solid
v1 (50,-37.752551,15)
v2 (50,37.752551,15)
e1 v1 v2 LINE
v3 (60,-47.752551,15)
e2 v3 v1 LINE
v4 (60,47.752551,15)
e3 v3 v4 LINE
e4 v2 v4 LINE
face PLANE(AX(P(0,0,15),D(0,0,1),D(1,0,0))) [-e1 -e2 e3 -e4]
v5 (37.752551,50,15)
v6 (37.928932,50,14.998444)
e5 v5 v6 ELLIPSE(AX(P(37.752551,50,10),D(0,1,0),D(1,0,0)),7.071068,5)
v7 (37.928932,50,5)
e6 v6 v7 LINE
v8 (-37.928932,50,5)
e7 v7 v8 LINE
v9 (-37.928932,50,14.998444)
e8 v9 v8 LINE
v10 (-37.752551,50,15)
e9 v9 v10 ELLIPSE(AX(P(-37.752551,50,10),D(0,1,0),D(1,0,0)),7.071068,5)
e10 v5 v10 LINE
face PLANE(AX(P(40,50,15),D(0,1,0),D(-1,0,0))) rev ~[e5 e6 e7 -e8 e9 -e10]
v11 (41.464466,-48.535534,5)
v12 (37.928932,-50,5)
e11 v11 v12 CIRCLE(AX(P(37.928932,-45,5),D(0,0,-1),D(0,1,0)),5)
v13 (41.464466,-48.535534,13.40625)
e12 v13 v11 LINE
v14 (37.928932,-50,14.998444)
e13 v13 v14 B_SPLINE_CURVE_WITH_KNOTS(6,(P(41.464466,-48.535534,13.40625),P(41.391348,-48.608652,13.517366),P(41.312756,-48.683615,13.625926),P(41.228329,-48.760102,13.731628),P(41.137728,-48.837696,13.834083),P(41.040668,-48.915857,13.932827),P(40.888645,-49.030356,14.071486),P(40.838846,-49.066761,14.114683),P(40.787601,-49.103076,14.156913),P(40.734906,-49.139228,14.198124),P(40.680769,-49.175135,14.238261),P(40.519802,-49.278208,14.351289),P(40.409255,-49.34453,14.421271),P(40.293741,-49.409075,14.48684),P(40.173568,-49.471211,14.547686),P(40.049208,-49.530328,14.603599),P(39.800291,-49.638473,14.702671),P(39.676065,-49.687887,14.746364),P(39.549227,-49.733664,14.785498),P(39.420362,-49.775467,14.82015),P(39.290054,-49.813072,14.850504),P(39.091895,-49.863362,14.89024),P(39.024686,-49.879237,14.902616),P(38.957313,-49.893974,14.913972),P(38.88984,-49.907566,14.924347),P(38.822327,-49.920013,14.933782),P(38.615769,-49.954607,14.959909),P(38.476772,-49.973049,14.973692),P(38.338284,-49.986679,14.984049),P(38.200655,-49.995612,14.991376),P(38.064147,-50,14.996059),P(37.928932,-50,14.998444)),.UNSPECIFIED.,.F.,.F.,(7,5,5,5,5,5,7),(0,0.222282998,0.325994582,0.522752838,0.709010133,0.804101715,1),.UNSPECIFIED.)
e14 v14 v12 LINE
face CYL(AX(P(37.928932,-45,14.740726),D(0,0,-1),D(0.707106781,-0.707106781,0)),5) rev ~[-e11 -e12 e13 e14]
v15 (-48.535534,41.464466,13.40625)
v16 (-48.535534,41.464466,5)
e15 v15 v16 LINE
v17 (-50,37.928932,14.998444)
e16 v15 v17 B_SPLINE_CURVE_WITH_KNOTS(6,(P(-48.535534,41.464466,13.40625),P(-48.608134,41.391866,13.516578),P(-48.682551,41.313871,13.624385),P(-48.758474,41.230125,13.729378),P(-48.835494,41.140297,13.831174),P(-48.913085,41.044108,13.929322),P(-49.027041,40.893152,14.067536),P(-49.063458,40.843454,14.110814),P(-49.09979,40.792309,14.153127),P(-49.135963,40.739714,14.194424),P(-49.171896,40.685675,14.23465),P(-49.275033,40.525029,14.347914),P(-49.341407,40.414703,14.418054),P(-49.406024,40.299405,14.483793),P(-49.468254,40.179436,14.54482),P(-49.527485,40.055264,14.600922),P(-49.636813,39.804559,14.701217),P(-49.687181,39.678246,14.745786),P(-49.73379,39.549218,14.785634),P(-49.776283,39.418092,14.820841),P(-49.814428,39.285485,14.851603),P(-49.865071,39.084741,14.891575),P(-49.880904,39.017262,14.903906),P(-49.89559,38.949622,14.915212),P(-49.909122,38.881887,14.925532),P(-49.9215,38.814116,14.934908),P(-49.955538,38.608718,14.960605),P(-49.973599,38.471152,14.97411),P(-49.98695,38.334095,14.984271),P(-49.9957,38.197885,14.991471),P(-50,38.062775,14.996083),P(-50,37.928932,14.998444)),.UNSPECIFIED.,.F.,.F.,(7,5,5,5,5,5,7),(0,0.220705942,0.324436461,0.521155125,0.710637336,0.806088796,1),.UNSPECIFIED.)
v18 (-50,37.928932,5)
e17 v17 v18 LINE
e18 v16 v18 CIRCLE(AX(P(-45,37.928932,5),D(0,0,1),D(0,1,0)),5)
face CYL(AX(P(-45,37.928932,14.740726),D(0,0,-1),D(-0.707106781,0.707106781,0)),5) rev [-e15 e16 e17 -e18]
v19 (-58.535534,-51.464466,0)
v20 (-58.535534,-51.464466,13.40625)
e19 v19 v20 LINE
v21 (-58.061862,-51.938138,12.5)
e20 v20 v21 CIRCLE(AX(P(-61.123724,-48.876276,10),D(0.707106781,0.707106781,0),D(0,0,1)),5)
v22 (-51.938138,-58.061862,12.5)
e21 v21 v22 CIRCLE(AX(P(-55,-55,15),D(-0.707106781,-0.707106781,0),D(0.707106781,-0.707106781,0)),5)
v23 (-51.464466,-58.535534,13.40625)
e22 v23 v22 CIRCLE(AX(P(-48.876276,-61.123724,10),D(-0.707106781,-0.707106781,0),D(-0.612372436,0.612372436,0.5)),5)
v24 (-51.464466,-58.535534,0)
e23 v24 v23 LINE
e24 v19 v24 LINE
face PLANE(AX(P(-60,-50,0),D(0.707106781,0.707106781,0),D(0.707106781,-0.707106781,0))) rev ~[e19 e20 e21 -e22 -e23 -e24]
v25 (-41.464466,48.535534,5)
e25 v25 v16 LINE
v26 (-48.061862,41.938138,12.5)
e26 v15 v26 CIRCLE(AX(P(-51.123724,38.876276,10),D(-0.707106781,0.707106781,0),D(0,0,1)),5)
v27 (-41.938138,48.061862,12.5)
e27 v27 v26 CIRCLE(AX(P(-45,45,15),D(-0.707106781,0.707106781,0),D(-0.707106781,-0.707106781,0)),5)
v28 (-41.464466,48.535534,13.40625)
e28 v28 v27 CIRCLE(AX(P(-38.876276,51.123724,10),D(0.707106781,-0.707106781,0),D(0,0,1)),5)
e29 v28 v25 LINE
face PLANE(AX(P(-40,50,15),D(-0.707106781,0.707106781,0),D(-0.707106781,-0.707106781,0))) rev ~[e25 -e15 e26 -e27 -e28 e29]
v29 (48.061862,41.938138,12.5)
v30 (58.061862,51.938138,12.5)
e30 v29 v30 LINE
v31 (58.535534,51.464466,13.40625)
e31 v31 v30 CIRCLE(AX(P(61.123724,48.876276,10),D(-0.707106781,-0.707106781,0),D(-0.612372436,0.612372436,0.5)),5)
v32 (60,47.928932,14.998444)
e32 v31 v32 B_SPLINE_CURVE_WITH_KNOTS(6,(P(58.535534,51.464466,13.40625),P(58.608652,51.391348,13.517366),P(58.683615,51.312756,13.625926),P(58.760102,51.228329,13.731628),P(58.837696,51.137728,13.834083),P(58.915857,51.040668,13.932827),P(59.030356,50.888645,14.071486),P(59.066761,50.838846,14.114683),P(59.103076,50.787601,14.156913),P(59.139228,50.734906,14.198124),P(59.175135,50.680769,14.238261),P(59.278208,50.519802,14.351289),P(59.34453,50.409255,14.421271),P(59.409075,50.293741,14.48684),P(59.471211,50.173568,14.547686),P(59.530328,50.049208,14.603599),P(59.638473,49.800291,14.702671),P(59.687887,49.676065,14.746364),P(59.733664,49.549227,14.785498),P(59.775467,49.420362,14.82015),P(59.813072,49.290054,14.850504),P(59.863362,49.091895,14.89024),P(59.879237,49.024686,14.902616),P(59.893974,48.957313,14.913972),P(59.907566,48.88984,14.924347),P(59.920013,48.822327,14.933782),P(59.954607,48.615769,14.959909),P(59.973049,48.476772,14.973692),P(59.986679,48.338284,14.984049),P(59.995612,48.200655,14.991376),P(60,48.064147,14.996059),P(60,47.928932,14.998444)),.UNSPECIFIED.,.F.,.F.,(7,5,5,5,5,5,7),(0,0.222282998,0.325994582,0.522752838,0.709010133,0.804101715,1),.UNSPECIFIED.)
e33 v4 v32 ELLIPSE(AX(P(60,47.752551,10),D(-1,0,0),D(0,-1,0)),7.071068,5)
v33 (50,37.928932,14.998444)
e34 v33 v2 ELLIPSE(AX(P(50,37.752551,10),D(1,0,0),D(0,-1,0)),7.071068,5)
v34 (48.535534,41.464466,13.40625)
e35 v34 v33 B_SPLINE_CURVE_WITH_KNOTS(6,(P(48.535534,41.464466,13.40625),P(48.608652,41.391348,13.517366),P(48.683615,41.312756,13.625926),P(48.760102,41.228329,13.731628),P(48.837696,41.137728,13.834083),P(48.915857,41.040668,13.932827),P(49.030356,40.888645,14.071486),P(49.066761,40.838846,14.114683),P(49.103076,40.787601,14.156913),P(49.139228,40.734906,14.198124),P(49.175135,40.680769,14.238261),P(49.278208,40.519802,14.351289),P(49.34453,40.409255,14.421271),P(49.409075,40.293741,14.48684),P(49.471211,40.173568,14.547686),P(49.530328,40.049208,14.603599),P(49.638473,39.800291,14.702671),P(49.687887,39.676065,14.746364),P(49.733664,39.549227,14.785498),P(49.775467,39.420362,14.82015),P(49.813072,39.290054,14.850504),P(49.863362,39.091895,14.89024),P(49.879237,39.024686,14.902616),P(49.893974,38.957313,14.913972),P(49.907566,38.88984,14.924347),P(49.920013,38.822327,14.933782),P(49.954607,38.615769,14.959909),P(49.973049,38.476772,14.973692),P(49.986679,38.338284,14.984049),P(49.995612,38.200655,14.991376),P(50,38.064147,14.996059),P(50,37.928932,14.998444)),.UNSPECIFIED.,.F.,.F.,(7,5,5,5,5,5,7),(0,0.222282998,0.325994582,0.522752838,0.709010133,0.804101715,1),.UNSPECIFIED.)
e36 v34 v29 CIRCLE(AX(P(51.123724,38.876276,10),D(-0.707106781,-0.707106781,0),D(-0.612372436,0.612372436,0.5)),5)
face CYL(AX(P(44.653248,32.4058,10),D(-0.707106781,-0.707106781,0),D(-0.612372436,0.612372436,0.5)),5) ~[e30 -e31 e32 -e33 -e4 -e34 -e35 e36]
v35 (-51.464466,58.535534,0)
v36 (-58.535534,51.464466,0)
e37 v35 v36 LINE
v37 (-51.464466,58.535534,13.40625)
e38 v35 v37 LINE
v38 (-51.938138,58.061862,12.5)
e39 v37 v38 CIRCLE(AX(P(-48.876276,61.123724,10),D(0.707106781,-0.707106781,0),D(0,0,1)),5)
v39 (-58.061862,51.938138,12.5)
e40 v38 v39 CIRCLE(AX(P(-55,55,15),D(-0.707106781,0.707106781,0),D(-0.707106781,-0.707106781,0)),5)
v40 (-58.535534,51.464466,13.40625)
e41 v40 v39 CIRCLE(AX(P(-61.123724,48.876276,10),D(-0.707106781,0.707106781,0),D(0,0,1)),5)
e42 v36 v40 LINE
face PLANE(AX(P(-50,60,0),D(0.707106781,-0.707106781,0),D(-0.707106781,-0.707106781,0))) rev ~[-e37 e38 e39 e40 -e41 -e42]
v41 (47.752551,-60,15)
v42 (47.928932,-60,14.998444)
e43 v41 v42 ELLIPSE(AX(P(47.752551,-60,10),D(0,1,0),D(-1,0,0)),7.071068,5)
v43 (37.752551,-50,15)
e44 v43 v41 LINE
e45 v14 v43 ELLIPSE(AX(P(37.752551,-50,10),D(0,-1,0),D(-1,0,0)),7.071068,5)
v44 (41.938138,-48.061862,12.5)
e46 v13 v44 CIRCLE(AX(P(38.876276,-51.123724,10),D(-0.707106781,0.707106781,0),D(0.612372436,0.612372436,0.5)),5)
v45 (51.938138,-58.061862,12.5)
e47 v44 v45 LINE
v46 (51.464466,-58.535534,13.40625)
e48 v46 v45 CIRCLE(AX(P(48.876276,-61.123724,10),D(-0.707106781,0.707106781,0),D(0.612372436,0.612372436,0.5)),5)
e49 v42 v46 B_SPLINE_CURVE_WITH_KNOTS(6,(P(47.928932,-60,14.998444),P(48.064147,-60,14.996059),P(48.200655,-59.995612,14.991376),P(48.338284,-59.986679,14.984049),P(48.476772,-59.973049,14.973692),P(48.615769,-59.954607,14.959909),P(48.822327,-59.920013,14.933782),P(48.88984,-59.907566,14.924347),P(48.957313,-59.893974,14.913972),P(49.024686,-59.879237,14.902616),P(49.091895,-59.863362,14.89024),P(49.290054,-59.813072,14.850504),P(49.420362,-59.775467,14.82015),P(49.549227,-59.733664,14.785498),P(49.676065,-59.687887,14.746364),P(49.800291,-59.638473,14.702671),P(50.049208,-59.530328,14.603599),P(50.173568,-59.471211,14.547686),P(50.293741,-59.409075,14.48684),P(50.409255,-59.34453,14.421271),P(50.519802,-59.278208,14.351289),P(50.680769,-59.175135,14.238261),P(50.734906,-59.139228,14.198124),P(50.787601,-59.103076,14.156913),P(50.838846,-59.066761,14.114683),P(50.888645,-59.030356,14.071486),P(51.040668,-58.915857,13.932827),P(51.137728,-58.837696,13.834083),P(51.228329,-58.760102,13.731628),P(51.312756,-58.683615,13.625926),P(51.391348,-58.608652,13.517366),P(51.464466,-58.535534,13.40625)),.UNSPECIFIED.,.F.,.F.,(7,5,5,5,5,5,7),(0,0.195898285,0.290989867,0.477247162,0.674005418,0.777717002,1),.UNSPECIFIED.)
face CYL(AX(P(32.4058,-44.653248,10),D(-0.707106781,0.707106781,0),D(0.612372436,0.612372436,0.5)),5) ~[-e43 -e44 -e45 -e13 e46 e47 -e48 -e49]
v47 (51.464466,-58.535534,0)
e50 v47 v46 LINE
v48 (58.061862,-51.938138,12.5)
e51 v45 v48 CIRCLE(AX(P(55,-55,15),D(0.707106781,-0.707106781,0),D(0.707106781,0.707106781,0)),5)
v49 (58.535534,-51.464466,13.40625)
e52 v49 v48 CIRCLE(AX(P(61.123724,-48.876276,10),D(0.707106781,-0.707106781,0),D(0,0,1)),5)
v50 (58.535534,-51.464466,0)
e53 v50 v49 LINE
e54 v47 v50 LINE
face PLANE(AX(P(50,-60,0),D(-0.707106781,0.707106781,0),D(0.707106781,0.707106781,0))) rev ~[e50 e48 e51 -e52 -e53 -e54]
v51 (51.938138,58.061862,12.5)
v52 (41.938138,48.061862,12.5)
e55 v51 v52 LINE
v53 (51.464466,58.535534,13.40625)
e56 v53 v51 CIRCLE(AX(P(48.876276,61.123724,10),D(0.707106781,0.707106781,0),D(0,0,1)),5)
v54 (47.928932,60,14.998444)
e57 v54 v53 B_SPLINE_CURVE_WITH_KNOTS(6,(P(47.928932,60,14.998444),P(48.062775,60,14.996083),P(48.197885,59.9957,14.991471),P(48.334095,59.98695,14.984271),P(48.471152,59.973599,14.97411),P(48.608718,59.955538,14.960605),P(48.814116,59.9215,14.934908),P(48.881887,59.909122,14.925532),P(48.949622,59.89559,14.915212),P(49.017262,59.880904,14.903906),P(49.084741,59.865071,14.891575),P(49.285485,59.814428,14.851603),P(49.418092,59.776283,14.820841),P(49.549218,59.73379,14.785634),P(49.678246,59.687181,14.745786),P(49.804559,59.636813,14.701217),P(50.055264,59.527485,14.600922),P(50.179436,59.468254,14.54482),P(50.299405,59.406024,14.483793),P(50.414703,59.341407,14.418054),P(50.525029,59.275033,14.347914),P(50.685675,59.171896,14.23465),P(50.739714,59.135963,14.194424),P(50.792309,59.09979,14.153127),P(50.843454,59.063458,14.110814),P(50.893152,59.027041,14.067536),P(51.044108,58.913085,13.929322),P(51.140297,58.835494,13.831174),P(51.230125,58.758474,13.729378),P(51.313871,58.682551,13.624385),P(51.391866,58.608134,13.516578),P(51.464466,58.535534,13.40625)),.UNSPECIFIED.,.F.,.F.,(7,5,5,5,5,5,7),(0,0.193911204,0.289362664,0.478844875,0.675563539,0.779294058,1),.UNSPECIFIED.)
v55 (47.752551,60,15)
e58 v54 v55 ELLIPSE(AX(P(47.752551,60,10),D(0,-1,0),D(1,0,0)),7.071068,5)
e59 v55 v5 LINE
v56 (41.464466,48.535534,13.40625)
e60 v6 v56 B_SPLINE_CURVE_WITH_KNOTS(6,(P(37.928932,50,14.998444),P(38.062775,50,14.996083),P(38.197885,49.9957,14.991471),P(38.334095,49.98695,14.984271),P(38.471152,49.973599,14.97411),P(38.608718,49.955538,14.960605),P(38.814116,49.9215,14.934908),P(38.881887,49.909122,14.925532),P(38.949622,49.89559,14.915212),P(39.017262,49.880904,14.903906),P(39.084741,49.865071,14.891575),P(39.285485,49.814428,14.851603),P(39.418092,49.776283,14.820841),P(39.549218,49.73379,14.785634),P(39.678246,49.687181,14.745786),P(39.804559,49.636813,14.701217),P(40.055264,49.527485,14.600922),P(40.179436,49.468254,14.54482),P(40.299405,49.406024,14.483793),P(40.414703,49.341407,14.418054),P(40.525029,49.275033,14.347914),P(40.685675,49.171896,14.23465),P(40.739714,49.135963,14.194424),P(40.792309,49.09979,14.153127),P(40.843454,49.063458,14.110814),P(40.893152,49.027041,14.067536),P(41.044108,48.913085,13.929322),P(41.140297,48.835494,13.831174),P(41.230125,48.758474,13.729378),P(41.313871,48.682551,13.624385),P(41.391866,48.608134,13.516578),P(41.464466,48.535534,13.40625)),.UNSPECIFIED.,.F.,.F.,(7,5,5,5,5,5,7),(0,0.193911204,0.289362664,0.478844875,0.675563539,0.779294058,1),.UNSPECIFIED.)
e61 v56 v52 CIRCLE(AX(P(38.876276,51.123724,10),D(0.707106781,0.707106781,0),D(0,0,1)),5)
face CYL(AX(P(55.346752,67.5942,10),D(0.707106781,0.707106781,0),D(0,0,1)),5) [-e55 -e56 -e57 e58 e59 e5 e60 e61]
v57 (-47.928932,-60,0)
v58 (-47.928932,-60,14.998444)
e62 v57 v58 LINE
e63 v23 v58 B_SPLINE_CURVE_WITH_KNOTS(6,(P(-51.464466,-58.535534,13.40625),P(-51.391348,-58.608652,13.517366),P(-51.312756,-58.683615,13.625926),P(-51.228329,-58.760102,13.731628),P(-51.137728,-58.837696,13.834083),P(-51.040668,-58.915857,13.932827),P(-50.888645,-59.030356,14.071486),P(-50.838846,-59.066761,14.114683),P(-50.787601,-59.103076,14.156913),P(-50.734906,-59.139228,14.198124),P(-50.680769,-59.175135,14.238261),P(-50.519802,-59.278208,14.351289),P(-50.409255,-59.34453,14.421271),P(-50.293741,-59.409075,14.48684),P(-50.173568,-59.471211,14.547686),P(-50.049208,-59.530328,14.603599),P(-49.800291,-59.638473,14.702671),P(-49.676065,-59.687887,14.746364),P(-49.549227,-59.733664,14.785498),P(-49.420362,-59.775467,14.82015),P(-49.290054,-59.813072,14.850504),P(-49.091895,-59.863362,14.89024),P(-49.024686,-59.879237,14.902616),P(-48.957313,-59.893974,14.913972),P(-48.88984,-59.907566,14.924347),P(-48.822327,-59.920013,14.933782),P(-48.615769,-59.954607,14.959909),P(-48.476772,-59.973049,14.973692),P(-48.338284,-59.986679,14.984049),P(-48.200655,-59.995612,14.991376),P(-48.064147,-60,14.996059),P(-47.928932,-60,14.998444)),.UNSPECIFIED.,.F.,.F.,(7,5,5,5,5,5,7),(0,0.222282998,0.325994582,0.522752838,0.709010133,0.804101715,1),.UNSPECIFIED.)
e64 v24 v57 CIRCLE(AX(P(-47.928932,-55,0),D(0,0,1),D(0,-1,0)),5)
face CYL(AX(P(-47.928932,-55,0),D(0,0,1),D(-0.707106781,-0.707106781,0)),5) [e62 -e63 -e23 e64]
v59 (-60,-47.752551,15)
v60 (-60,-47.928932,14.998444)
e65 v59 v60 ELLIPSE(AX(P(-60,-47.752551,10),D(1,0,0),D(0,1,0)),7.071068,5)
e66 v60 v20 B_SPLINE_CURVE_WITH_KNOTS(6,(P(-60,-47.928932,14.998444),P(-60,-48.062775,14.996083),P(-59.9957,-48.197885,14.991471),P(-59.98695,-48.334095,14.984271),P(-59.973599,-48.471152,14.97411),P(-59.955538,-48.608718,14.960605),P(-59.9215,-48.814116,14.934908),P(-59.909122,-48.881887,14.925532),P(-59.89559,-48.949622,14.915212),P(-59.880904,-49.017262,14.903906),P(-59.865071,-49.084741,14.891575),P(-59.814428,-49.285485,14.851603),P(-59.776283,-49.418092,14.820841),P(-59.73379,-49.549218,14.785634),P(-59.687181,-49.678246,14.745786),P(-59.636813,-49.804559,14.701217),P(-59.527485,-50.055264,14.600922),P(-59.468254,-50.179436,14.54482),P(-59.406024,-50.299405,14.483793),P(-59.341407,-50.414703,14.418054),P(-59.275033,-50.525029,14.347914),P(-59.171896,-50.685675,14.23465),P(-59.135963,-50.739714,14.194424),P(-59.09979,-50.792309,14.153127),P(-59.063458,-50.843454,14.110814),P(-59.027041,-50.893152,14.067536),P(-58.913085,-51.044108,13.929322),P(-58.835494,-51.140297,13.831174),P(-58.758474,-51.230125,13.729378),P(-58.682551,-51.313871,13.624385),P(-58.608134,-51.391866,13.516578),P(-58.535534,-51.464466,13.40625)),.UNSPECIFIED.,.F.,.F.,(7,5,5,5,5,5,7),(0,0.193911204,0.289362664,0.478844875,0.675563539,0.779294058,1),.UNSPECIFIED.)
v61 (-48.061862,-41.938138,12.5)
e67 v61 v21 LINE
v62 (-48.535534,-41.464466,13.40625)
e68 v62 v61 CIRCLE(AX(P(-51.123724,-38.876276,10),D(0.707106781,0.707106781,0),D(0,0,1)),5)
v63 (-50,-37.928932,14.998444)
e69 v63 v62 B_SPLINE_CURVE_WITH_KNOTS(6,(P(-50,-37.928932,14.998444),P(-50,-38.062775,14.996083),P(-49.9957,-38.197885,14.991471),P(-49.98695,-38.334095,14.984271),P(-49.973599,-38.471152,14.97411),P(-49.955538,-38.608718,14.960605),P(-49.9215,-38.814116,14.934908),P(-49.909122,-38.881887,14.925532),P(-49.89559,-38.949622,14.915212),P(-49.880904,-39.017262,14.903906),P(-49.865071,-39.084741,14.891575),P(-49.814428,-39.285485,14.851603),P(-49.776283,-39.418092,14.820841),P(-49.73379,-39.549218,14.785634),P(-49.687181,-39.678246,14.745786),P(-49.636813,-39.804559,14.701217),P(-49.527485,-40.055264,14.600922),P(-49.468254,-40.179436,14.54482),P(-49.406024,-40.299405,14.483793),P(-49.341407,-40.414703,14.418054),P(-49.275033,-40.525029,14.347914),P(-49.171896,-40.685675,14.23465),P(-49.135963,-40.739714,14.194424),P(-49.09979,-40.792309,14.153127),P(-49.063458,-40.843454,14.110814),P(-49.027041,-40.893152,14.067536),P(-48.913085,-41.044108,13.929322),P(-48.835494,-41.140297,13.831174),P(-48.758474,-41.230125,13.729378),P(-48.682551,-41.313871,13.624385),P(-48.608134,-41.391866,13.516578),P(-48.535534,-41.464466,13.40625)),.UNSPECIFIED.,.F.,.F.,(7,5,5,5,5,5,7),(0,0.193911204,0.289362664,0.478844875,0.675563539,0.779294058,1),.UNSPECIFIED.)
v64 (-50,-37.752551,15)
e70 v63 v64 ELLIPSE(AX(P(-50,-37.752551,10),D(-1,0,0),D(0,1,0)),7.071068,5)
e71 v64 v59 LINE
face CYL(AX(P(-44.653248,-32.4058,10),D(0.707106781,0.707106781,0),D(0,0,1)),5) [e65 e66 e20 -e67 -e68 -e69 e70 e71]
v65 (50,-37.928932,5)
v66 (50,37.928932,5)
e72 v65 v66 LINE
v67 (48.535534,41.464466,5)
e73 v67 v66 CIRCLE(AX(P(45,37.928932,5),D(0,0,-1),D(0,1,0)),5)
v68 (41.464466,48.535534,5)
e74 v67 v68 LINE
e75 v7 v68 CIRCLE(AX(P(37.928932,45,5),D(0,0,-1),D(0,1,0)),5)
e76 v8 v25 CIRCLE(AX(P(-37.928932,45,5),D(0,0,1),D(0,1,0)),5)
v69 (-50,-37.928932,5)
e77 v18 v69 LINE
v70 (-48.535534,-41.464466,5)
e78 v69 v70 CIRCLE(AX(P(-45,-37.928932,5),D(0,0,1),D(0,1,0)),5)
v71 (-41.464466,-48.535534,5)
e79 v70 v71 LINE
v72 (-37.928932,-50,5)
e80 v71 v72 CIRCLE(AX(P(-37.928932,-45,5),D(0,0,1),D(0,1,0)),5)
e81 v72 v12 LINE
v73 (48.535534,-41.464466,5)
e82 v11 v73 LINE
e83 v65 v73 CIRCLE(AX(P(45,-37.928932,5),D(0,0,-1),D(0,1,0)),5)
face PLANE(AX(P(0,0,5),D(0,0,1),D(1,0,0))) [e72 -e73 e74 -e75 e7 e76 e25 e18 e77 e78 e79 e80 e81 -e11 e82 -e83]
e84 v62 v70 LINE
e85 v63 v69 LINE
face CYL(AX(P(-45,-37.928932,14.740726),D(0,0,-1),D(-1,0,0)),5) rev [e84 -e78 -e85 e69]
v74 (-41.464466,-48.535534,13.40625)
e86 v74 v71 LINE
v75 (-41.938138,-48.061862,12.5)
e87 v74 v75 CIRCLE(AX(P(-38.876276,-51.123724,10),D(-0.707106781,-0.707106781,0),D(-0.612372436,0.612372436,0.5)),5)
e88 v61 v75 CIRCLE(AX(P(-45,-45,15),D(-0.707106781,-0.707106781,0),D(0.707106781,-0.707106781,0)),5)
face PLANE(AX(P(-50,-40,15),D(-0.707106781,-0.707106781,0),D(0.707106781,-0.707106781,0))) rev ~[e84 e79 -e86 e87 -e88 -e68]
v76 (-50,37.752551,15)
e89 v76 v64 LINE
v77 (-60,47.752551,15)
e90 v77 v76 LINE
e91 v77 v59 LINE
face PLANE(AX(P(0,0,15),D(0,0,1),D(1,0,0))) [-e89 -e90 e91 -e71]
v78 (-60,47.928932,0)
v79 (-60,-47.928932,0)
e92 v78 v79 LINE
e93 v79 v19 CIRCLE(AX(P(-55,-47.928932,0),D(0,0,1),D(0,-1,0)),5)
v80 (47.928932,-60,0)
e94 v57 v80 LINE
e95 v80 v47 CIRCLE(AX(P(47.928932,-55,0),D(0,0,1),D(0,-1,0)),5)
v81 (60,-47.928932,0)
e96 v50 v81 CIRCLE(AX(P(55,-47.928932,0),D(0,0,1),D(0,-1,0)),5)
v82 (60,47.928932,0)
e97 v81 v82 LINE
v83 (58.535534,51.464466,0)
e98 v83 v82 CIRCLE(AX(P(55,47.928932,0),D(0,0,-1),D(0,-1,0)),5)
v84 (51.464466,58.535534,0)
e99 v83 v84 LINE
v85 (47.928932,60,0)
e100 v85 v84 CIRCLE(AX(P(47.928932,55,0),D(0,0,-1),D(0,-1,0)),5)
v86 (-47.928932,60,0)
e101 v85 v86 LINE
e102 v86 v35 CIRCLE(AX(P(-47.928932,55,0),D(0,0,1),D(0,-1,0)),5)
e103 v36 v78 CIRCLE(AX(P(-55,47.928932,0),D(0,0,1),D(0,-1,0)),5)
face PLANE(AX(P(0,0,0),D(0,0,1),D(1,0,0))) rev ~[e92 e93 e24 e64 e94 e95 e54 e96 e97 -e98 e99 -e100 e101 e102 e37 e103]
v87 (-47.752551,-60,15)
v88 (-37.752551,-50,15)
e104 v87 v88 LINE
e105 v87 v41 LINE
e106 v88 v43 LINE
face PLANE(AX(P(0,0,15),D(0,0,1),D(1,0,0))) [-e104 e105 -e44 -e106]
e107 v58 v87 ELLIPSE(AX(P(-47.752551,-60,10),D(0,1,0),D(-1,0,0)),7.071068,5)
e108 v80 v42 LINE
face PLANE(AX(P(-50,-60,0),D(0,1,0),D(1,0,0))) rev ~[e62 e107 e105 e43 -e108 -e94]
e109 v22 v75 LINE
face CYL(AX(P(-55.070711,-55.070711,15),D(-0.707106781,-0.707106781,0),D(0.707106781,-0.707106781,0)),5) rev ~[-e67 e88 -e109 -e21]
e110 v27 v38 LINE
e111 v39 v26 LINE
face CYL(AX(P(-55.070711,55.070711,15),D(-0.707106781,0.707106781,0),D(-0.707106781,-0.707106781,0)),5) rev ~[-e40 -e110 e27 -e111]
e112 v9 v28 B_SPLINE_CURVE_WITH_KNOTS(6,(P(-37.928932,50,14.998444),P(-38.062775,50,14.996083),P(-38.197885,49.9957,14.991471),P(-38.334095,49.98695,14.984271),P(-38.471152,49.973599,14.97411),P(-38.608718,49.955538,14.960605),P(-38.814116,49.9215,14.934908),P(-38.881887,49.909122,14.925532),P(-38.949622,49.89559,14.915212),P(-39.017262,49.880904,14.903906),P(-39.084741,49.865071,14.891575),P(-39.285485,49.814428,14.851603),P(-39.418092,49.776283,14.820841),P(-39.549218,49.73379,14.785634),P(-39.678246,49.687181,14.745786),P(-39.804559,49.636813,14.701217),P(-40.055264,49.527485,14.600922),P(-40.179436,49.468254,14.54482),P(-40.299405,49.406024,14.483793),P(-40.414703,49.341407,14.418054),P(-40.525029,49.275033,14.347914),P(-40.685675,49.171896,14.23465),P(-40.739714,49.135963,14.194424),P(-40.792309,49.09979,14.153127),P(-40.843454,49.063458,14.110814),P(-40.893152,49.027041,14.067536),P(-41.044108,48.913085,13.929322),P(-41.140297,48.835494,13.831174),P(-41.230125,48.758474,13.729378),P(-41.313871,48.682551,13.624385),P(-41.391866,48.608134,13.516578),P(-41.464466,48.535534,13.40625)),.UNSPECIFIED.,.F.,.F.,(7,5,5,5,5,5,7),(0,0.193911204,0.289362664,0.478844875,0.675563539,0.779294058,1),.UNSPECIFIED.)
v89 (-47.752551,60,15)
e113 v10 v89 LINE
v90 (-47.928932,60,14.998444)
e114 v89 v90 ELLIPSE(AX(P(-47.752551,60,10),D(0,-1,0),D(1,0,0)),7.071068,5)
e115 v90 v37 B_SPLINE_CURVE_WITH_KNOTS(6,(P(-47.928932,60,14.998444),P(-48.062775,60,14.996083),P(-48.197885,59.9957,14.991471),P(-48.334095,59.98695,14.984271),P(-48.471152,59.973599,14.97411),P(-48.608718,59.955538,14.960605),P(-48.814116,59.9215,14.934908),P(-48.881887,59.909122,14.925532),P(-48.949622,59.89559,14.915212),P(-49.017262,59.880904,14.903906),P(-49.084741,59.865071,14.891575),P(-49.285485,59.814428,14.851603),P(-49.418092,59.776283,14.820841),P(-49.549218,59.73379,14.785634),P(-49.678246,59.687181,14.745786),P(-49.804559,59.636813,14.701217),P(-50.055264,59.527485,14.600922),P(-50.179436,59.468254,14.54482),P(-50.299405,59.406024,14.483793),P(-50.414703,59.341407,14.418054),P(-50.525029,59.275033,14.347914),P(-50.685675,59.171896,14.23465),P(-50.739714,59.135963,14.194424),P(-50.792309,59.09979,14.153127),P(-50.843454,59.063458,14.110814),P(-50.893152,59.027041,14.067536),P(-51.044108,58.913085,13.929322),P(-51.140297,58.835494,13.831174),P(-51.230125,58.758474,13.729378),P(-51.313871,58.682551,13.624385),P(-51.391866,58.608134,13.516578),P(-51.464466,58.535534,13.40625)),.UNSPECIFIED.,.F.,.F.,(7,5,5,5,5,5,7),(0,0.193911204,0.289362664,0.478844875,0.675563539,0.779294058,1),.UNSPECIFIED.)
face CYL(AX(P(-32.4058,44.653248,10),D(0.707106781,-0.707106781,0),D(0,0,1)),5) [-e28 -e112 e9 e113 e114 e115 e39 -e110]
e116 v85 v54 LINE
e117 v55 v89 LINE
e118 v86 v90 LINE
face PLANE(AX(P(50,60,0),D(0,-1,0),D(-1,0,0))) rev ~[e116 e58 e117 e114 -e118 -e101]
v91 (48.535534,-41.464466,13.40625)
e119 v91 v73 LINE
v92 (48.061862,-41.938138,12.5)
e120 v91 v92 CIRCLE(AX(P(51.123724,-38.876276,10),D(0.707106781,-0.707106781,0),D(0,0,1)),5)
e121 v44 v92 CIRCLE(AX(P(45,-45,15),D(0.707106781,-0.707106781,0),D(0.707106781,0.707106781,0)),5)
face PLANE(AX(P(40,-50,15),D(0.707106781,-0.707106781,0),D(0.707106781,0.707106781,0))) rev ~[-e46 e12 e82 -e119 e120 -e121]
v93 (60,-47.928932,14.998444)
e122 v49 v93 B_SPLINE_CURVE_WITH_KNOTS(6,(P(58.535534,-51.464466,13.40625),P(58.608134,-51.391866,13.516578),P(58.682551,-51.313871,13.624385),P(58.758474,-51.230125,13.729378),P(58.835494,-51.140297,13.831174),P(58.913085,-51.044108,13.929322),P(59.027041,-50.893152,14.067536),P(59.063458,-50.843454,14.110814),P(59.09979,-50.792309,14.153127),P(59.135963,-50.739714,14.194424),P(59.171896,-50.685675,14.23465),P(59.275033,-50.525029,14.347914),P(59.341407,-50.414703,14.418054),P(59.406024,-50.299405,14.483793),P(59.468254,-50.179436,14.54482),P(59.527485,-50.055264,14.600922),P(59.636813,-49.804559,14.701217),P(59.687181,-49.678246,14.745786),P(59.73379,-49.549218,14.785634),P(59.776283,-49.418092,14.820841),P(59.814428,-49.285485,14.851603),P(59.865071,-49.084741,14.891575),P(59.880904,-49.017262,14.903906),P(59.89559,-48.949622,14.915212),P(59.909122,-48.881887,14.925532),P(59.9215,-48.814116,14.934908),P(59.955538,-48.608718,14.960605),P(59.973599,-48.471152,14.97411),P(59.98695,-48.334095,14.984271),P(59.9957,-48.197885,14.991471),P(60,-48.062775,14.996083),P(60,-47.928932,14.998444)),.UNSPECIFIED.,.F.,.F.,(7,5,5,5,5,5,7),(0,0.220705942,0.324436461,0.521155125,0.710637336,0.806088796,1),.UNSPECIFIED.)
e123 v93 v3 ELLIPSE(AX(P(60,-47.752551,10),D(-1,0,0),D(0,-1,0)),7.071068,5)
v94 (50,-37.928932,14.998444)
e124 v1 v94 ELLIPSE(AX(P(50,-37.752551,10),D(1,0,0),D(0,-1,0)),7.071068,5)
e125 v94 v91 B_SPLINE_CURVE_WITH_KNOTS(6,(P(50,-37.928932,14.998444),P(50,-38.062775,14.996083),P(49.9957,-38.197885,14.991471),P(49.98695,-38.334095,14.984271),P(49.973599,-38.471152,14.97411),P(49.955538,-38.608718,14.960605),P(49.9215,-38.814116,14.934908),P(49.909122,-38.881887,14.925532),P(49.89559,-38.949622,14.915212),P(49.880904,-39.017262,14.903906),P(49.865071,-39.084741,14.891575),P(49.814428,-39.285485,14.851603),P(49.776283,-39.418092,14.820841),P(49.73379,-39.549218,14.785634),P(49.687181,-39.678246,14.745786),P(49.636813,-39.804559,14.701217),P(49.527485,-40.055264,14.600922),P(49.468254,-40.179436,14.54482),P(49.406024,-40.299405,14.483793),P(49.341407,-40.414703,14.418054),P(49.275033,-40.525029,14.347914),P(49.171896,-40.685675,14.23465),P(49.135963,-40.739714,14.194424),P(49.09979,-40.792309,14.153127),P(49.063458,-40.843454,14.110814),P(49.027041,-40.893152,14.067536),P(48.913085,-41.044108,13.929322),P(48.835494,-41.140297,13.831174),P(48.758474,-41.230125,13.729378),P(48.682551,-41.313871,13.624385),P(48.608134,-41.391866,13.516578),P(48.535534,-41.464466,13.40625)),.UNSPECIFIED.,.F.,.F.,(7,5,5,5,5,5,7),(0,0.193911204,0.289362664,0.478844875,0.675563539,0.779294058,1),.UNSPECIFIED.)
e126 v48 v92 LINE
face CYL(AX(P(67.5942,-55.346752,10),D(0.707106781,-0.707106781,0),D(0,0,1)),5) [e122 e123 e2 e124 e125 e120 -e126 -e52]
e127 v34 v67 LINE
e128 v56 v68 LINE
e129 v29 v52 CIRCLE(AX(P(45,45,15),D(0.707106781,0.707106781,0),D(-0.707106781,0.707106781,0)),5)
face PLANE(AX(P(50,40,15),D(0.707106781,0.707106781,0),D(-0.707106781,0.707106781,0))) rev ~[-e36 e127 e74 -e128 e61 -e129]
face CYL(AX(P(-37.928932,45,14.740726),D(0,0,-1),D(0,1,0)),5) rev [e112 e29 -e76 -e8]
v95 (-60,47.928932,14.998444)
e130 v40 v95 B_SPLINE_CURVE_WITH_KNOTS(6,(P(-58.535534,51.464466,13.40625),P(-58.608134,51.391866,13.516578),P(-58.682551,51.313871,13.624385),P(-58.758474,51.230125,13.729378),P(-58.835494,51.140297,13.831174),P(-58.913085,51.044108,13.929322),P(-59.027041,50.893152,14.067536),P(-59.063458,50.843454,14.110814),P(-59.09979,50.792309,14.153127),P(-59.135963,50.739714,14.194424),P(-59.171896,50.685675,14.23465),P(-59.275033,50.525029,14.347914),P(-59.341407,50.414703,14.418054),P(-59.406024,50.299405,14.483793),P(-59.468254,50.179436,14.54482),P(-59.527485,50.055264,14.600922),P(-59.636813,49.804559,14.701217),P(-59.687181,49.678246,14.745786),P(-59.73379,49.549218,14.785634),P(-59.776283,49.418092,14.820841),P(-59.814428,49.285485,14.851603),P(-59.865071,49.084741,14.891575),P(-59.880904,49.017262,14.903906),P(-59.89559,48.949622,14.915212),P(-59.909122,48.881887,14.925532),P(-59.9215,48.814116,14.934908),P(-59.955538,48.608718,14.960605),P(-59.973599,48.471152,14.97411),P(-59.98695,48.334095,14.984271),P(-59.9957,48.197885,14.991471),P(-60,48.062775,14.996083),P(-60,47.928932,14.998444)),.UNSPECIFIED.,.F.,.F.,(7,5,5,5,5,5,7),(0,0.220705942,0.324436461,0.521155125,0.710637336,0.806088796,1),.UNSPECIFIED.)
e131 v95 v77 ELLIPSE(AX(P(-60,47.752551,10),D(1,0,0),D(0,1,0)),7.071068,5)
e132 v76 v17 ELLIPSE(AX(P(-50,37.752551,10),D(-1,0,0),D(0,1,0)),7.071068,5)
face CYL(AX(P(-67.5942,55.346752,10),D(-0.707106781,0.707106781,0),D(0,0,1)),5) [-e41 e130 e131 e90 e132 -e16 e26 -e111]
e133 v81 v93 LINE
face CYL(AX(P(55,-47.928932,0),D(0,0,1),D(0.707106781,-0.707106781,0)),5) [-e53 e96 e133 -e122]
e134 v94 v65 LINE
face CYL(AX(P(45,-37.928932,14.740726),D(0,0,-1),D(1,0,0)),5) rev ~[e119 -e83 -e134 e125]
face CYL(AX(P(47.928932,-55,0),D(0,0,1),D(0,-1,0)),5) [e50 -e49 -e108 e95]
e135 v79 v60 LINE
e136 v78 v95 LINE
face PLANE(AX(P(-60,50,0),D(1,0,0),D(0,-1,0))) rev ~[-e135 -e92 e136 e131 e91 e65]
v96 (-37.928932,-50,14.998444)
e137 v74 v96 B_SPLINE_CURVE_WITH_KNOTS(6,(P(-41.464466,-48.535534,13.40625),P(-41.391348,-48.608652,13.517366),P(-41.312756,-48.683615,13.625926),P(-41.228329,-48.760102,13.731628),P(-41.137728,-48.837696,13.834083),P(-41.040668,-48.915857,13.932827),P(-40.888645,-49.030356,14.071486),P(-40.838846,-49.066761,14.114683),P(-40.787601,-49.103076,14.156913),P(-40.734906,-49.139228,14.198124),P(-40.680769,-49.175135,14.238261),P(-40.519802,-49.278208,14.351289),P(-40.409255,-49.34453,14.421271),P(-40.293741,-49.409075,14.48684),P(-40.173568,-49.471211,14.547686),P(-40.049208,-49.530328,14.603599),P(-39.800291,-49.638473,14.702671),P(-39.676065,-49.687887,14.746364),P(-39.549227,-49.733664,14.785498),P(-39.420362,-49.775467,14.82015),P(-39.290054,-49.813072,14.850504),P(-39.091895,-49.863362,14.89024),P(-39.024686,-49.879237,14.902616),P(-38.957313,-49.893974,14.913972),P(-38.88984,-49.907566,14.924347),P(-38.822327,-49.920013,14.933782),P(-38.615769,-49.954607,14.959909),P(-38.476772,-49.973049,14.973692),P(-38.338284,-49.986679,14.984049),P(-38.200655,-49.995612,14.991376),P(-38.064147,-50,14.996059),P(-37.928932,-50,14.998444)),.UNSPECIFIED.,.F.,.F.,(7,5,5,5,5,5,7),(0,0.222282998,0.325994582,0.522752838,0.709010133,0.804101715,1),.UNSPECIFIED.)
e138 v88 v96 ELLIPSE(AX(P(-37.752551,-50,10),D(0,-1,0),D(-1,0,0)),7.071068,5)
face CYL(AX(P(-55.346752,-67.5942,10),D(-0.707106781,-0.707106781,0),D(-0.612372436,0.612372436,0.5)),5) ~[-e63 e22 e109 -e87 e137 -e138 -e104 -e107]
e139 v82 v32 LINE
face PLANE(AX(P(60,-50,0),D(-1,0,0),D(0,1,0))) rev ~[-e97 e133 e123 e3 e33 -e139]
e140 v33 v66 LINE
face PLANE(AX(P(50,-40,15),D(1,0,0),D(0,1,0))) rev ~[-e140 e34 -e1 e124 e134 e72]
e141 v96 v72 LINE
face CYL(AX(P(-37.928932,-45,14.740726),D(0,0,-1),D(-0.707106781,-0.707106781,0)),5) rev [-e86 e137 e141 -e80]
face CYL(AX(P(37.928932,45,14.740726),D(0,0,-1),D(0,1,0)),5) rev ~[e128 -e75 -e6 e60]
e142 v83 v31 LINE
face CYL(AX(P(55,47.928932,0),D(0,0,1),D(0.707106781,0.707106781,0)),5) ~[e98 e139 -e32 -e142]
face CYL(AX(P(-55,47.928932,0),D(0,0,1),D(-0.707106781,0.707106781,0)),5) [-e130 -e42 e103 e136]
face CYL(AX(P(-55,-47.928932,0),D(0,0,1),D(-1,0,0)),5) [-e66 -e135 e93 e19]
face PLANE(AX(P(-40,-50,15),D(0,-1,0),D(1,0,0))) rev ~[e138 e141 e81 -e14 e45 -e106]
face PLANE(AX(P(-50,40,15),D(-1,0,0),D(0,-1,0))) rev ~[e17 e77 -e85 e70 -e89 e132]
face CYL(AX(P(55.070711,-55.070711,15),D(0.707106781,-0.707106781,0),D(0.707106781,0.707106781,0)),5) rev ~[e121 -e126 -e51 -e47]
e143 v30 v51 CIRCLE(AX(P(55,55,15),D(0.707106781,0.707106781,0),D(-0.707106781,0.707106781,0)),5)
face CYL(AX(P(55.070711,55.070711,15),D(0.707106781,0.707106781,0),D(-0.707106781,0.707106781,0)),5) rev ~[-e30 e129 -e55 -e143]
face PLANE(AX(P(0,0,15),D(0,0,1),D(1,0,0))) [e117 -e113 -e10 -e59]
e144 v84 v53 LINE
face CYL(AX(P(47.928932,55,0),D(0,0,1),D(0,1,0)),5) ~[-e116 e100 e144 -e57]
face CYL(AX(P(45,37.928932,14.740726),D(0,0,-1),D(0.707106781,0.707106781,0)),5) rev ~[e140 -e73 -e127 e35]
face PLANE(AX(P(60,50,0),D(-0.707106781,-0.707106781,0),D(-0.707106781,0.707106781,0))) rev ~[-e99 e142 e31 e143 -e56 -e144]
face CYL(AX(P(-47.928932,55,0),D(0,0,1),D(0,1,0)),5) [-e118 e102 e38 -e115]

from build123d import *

# Parameters (mm, degrees)
F1_DEPTH      = 15
F3_DEPTH      = 10
F5_R          = 5
F6_DEPTH      = 15
F8_R          = 5
F9_DEPTH      = 15
F11_R         = 5
F12_DEPTH     = 15
F14_R         = 5
F15_DEPTH     = 15
F16_T1_DEPTH  = 32.443405813
F16_T3_DEPTH  = 32.443405813
F16_T5_DEPTH  = 32.443405813
F16_T7_DEPTH  = 32.443405813
F16_T9_DEPTH  = 32.443405813
F16_T11_DEPTH = 32.443405813
F16_T13_DEPTH = 32.443405813
F16_T15_DEPTH = 32.443405813
F17_R         = 5
F18_R         = 5


# Not quite as in the source:
# - a fillet or chamfer that OpenCascade refuses, or shapes differently, is made with other operations: its cross-section is extruded or revolved along the edge and cut away or added


with BuildPart() as f1:
    # F0 (on Top) → F1 (new body)
    with BuildSketch(Plane.XY):
        Polygon((50, 60), (-50, 60), (-60, 50), (-60, -50), (-50, -60), (50, -60), (60, -50), (60, 50), align=None)
    extrude(amount=F1_DEPTH)

    # F2 (on face) → F3 (cut)
    with BuildSketch(Plane.XY.offset(15)):
        Polygon((40, 50), (-40, 50), (-50, 40), (-50, -40), (-40, -50), (40, -50), (50, -40), (50, 40), align=None)
    extrude(amount=-F3_DEPTH, mode=Mode.SUBTRACT)

    # F5 (on offset) → F6 (cut)
    with BuildSketch(Plane(origin=(-55.0707106781, 55.0707106781, 0), x_dir=(-0.7071067812, -0.7071067812, 0), z_dir=(-0.7071067812, 0.7071067812, 0))):
        with Locations((0, 15)):
            Circle(F5_R)
    extrude(amount=-F6_DEPTH, mode=Mode.SUBTRACT)

    # F8 (on offset) → F9 (cut)
    with BuildSketch(Plane(origin=(55.0707106781, 55.0707106781, 0), x_dir=(-0.7071067812, 0.7071067812, 0), z_dir=(0.7071067812, 0.7071067812, 0))):
        with Locations((0, 15)):
            Circle(F8_R)
    extrude(amount=-F9_DEPTH, mode=Mode.SUBTRACT)

    # F11 (on offset) → F12 (cut)
    with BuildSketch(Plane(origin=(55.0707106781, -55.0707106781, 0), x_dir=(0.7071067812, 0.7071067812, 0), z_dir=(0.7071067812, -0.7071067812, 0))):
        with Locations((0, 15)):
            Circle(F11_R)
    extrude(amount=-F12_DEPTH, mode=Mode.SUBTRACT)

    # F14 (on offset) → F15 (cut)
    with BuildSketch(Plane(origin=(-55.0707106781, -55.0707106781, 0), x_dir=(0.7071067812, -0.7071067812, 0), z_dir=(-0.7071067812, -0.7071067812, 0))):
        with Locations((0, 15)):
            Circle(F14_R)
    extrude(amount=-F15_DEPTH, mode=Mode.SUBTRACT)

    # F16: fillet of radius 5 on 8 edges, made by hand

    # F16_s2 → F16_t1 (cut)
    with BuildSketch(Plane(origin=(-61.4704761276, 61.4704761276, 0), x_dir=(0, 0, 1), z_dir=(0.7071067812, -0.7071067812, 0))):
        with BuildLine():
            ThreePointArc((15, 8.6602540378), (14.3301270189, 6.1602540378), (12.5, 4.3301270189))
            ThreePointArc((12.5, 4.3301270189), (13.7059047745, 4.8296291314), (15, 5))
            Line((15, 5), (15, 8.6602540378))
        make_face()
    extrude(amount=F16_T1_DEPTH, mode=Mode.SUBTRACT)

    # F16_s4 → F16_t3 (cut)
    with BuildSketch(Plane(origin=(-38.5295238724, 38.5295238724, 0), x_dir=(0, 0, 1), z_dir=(-0.7071067812, 0.7071067812, 0))):
        with BuildLine():
            ThreePointArc((15, 8.6602540378), (14.3301270189, 6.1602540378), (12.5, 4.3301270189))
            ThreePointArc((12.5, 4.3301270189), (13.7059047745, 4.8296291314), (15, 5))
            Line((15, 5), (15, 8.6602540378))
        make_face()
    extrude(amount=F16_T3_DEPTH, mode=Mode.SUBTRACT)

    # F16_s6 → F16_t5 (cut)
    with BuildSketch(Plane(origin=(-38.5295238724, -38.5295238724, 0), x_dir=(0, 0, 1), z_dir=(-0.7071067812, -0.7071067812, 0))):
        with BuildLine():
            ThreePointArc((15, 8.6602540378), (14.3301270189, 6.1602540378), (12.5, 4.3301270189))
            ThreePointArc((12.5, 4.3301270189), (13.7059047745, 4.8296291314), (15, 5))
            Line((15, 5), (15, 8.6602540378))
        make_face()
    extrude(amount=F16_T5_DEPTH, mode=Mode.SUBTRACT)

    # F16_s8 → F16_t7 (cut)
    with BuildSketch(Plane(origin=(-61.4704761276, -61.4704761276, 0), x_dir=(0, 0, 1), z_dir=(0.7071067812, 0.7071067812, 0))):
        with BuildLine():
            ThreePointArc((12.5, 4.3301270189), (14.3301270189, 6.1602540378), (15, 8.6602540378))
            Line((15, 8.6602540378), (15, 5))
            ThreePointArc((15, 5), (13.7059047745, 4.8296291314), (12.5, 4.3301270189))
        make_face()
    extrude(amount=F16_T7_DEPTH, mode=Mode.SUBTRACT)

    # F16_s10 → F16_t9 (cut)
    with BuildSketch(Plane(origin=(61.4704761276, -61.4704761276, 0), x_dir=(0, 0, 1), z_dir=(-0.7071067812, 0.7071067812, 0))):
        with BuildLine():
            ThreePointArc((15, 8.6602540378), (14.3301270189, 6.1602540378), (12.5, 4.3301270189))
            ThreePointArc((12.5, 4.3301270189), (13.7059047745, 4.8296291314), (15, 5))
            Line((15, 5), (15, 8.6602540378))
        make_face()
    extrude(amount=F16_T9_DEPTH, mode=Mode.SUBTRACT)

    # F16_s12 → F16_t11 (cut)
    with BuildSketch(Plane(origin=(38.5295238724, -38.5295238724, 0), x_dir=(0, 0, 1), z_dir=(0.7071067812, -0.7071067812, 0))):
        with BuildLine():
            ThreePointArc((12.5, 4.3301270189), (14.3301270189, 6.1602540378), (15, 8.6602540378))
            Line((15, 8.6602540378), (15, 5))
            ThreePointArc((15, 5), (13.7059047745, 4.8296291314), (12.5, 4.3301270189))
        make_face()
    extrude(amount=F16_T11_DEPTH, mode=Mode.SUBTRACT)

    # F16_s14 → F16_t13 (cut)
    with BuildSketch(Plane(origin=(61.4704761276, 61.4704761276, 0), x_dir=(0, 0, 1), z_dir=(-0.7071067812, -0.7071067812, 0))):
        with BuildLine():
            ThreePointArc((15, 8.6602540378), (14.3301270189, 6.1602540378), (12.5, 4.3301270189))
            ThreePointArc((12.5, 4.3301270189), (13.7059047745, 4.8296291314), (15, 5))
            Line((15, 5), (15, 8.6602540378))
        make_face()
    extrude(amount=F16_T13_DEPTH, mode=Mode.SUBTRACT)

    # F16_s16 → F16_t15 (cut)
    with BuildSketch(Plane(origin=(38.5295238724, 38.5295238724, 0), x_dir=(0, 0, 1), z_dir=(0.7071067812, 0.7071067812, 0))):
        with BuildLine():
            ThreePointArc((12.5, 4.3301270189), (14.3301270189, 6.1602540378), (15, 8.6602540378))
            Line((15, 8.6602540378), (15, 5))
            ThreePointArc((15, 5), (13.7059047745, 4.8296291314), (12.5, 4.3301270189))
        make_face()
    extrude(amount=F16_T15_DEPTH, mode=Mode.SUBTRACT)

    # F17
    f17_edges = [f1.edges().sort_by_distance(p)[0] for p in [
        (-60, 50, 7.370363),
        (-50, 60, 7.370363),
        (-60, -50, 7.370363),
        (-50, -60, 7.370363),
        (50, -60, 7.370363),
        (60, -50, 7.370363),
        (60, 50, 7.370363),
        (50, 60, 7.370363),
    ]]
    fillet(f17_edges, radius=F17_R)

    # F18
    f18_edges = [f1.edges().sort_by_distance(p)[0] for p in [
        (-40, -50, 9.870363),
        (-50, -40, 9.870363),
        (-50, 40, 9.870363),
        (-40, 50, 9.870363),
        (40, 50, 9.870363),
        (50, 40, 9.870363),
        (50, -40, 9.870363),
        (40, -50, 9.870363),
    ]]
    fillet(f18_edges, radius=F18_R)


solid = f1.part
